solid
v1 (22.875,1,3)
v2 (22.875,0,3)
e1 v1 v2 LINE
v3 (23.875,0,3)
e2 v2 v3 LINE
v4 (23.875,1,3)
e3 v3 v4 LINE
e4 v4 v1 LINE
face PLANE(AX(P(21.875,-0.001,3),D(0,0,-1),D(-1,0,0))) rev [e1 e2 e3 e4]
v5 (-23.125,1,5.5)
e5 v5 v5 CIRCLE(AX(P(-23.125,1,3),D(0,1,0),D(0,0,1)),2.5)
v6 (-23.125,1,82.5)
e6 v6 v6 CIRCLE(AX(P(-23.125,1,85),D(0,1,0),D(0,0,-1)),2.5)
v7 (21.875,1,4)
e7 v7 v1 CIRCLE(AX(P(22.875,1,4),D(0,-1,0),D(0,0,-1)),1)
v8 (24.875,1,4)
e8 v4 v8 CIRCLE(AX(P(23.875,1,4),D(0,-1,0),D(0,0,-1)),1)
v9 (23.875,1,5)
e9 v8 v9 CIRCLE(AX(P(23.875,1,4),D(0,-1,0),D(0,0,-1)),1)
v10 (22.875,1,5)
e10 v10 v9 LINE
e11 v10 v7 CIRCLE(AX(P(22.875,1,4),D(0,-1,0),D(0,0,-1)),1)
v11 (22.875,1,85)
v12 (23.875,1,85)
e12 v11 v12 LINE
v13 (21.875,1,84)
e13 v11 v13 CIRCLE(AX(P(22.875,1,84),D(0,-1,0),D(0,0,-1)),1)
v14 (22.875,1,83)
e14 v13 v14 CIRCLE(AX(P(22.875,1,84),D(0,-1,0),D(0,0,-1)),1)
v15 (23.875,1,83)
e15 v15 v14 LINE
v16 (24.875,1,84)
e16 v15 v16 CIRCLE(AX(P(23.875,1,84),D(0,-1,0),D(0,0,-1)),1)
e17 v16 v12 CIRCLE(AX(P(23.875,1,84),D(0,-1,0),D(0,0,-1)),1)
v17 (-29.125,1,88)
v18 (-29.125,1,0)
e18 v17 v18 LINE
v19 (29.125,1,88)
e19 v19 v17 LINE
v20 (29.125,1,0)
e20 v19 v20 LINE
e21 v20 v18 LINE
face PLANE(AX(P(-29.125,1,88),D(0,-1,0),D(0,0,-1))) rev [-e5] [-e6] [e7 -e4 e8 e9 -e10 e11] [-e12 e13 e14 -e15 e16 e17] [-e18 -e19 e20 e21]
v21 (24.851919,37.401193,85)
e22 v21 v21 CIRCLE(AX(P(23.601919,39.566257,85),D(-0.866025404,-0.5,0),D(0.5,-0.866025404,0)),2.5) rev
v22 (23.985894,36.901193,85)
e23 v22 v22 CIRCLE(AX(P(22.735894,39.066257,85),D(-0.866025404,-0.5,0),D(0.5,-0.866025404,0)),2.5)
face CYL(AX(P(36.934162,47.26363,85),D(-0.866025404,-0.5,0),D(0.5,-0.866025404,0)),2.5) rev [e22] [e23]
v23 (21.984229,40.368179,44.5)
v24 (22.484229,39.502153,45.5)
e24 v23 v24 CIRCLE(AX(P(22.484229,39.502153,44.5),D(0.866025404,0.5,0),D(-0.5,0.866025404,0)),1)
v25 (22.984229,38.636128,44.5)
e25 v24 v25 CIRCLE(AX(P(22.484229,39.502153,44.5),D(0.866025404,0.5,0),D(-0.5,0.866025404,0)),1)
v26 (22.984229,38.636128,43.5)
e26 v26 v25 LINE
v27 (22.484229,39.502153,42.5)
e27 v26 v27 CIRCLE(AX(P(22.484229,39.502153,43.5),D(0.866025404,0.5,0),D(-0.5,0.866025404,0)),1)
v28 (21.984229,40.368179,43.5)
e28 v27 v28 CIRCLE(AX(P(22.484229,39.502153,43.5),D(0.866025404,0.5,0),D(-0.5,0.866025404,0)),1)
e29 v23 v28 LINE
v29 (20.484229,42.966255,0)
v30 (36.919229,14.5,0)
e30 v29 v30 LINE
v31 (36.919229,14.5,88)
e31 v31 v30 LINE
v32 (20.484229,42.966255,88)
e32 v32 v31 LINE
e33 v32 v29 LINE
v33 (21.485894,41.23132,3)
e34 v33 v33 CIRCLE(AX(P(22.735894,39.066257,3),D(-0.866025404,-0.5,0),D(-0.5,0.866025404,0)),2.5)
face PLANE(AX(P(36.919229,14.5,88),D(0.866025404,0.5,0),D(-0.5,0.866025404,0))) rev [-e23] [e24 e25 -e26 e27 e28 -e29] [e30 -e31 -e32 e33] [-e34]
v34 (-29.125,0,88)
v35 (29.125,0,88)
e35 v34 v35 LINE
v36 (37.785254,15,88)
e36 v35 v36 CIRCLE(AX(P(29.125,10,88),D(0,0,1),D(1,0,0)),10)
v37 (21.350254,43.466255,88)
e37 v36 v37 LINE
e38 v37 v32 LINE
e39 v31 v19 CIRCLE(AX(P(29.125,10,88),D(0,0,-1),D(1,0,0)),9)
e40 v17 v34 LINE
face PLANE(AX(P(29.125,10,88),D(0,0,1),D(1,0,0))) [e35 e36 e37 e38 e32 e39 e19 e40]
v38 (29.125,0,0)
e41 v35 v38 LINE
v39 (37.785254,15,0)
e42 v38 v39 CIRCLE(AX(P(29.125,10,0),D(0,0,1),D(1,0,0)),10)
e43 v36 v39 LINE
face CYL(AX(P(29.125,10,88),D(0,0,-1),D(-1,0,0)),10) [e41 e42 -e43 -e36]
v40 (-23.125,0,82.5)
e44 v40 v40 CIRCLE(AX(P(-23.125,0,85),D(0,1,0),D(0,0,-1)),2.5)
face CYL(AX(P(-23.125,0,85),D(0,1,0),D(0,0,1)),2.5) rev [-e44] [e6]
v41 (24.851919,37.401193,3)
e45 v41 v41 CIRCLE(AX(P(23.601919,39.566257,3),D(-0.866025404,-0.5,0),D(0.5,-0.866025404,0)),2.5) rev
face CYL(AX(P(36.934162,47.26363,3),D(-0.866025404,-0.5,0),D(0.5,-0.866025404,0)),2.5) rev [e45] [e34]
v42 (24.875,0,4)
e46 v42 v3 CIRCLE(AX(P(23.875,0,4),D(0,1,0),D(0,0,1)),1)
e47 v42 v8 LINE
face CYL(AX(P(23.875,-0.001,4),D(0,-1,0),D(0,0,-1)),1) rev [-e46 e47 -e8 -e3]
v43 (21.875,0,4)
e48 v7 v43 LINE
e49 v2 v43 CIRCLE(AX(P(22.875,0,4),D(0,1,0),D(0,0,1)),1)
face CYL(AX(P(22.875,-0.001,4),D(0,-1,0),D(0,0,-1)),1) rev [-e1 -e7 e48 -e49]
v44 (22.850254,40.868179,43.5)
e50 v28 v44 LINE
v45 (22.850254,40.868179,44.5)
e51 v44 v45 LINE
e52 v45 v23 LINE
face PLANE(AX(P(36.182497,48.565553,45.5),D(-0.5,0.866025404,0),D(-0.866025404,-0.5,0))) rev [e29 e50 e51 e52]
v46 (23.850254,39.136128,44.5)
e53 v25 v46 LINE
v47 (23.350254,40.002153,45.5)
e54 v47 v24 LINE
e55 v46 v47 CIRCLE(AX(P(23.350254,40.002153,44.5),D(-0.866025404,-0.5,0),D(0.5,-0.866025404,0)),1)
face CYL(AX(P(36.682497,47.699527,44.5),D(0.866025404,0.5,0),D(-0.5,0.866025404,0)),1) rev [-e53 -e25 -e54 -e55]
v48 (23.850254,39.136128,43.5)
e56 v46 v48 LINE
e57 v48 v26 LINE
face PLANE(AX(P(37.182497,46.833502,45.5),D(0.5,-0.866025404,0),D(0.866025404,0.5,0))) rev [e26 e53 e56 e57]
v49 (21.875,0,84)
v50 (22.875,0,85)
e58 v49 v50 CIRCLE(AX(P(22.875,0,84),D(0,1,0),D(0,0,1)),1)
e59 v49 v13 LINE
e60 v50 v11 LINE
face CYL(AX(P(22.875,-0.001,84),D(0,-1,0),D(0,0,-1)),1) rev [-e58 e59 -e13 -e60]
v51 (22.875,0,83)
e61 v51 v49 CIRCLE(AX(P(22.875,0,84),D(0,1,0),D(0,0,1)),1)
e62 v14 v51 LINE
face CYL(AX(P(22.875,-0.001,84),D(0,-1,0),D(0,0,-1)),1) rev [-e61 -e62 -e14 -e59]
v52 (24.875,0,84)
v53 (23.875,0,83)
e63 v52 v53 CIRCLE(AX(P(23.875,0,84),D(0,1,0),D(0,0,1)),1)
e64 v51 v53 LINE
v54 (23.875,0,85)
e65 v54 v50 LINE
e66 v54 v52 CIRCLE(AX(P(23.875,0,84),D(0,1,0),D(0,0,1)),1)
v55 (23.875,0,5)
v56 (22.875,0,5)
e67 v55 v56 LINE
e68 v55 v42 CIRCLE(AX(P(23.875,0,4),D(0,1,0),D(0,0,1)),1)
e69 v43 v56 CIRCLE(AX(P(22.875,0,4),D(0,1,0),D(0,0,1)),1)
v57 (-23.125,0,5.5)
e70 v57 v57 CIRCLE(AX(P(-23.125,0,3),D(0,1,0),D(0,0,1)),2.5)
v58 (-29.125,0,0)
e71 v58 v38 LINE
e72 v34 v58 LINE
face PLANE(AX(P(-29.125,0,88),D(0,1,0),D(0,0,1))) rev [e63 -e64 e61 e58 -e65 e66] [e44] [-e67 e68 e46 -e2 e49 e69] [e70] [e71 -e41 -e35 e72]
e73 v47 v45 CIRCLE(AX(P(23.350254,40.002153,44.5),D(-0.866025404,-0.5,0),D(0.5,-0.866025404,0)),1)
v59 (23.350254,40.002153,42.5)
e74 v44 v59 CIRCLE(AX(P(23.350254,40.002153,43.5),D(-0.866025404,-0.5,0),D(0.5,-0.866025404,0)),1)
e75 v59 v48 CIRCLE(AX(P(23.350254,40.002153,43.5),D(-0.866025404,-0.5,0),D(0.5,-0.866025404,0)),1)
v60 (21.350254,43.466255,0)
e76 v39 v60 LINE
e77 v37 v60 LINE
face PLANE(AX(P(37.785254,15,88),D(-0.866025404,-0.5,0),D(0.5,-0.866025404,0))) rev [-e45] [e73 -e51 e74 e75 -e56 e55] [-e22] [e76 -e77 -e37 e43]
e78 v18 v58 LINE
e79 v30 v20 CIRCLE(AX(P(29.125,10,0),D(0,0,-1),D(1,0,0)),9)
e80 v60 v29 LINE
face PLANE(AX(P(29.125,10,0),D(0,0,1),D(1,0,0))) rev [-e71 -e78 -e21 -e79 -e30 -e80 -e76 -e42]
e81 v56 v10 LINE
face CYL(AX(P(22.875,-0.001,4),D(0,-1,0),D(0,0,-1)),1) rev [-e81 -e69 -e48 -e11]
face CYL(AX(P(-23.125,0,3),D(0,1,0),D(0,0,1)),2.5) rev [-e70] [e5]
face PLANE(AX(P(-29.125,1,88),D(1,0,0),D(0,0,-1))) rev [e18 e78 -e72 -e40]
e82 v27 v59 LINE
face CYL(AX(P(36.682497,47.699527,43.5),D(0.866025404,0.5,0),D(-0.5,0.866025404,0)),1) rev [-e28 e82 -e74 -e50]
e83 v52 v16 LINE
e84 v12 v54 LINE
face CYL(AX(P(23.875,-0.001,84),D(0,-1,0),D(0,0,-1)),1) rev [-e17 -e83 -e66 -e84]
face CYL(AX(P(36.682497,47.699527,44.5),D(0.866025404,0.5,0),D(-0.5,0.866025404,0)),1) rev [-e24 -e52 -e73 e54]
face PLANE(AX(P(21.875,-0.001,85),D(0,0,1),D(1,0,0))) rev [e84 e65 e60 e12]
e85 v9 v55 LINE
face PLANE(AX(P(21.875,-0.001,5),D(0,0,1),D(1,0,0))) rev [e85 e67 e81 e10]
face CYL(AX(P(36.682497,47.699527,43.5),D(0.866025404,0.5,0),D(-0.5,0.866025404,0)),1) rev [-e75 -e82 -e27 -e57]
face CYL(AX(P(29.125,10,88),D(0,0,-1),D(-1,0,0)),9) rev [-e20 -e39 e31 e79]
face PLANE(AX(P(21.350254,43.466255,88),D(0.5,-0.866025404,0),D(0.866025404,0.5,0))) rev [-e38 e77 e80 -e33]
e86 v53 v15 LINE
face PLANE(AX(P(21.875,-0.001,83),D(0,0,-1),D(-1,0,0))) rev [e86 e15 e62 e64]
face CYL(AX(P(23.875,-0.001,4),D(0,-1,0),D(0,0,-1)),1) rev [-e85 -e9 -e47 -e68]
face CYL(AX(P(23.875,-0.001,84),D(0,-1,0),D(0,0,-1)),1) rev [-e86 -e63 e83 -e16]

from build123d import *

# Parameters (mm, degrees)
BASE_DEPTH                 = 88
SZKIC3_R                   = 2.5
HOLES_DEPTH                = 106.252783529
WYTNIJ_WYCI_GNI_CIE1_REACH = 107.253
SZKIC6_W                   = 3
SZKIC6_H                   = 2
WYTNIJ_WYCI_GNI_CIE3_REACH = 112.877
SZKIC7_R                   = 2.5
WYTNIJ_WYCI_GNI_CIE4_REACH = 112.877
SZKIC8_W                   = 3
SZKIC8_H                   = 2
ZAOKR_GLENIE1_R            = 1


with BuildPart() as part:
    # Szkic1 → base (new body)
    with BuildSketch(Plane.XY):
        with BuildLine():
            Line((-29.125, 0), (29.125, 0))
            ThreePointArc((29.125, 0), (37.785254038, 5), (37.785254038, 15))
            Line((37.785254038, 15), (21.350254038, 43.466255022))
            Line((21.350254038, 43.466255022), (20.484228634, 42.966255022))
            Line((20.484228634, 42.966255022), (36.919228634, 14.5))
            ThreePointArc((36.919228634, 14.5), (36.919228634, 5.5), (29.125, 1))
            Line((29.125, 1), (-29.125, 1))
            Line((-29.125, 1), (-29.125, 0))
        make_face()
    extrude(amount=BASE_DEPTH)

    # Szkic3 → holes (cut, through all)
    with BuildSketch(Plane(origin=(0, 1, 0), x_dir=(1, 0, 0), z_dir=(0, 1, 0))):
        with Locations(Location((-23.125, -3, 0), (0, 0, 270))):
            Circle(SZKIC3_R)
        with Locations(Location((-23.125, -85, 0), (0, 0, 90))):
            Circle(SZKIC3_R)
    extrude(amount=-HOLES_DEPTH, mode=Mode.SUBTRACT)

    # Szkic6 → Wytnij-wyciągnięcie1 (cut, up to next)
    with BuildSketch(Plane(origin=(0, 1, 0), x_dir=(1, 0, 0), z_dir=(0, 1, 0)), mode=Mode.PRIVATE) as wytnij_wyci_gni_cie1_sk1:
        with Locations((23.375, -84)):
            Rectangle(SZKIC6_W, SZKIC6_H)
    wytnij_wyci_gni_cie1_tool1 = extrude(wytnij_wyci_gni_cie1_sk1.sketch, amount=-WYTNIJ_WYCI_GNI_CIE1_REACH, mode=Mode.PRIVATE) & part.part
    # Szkic6 → Wytnij-wyciągnięcie1 (cut, up to next)
    with BuildSketch(Plane(origin=(0, 1, 0), x_dir=(1, 0, 0), z_dir=(0, 1, 0)), mode=Mode.PRIVATE) as wytnij_wyci_gni_cie1_sk2:
        with Locations((23.375, -4)):
            Rectangle(SZKIC6_W, SZKIC6_H)
    wytnij_wyci_gni_cie1_tool2 = extrude(wytnij_wyci_gni_cie1_sk2.sketch, amount=-WYTNIJ_WYCI_GNI_CIE1_REACH, mode=Mode.PRIVATE) & part.part
    add(wytnij_wyci_gni_cie1_tool1.solids().sort_by_distance((23.375, 1, 84))[0], mode=Mode.SUBTRACT)
    add(wytnij_wyci_gni_cie1_tool2.solids().sort_by_distance((23.375, 1, 4))[0], mode=Mode.SUBTRACT)

    # Szkic7 → Wytnij-wyciągnięcie3 (cut, up to next)
    with BuildSketch(Plane(origin=(33.968105653, 19.611494943, 0), x_dir=(0, 0, 1), z_dir=(-0.8660254037844387, -0.5000000000000001, 0)), mode=Mode.PRIVATE) as wytnij_wyci_gni_cie3_sk1:
        with Locations(Location((85, 22.464423789, 0), (0, 0, 270))):
            Circle(SZKIC7_R)
    wytnij_wyci_gni_cie3_tool1 = extrude(wytnij_wyci_gni_cie3_sk1.sketch, amount=-WYTNIJ_WYCI_GNI_CIE3_REACH, mode=Mode.PRIVATE) & part.part
    # Szkic7 → Wytnij-wyciągnięcie3 (cut, up to next)
    with BuildSketch(Plane(origin=(33.968105653, 19.611494943, 0), x_dir=(0, 0, 1), z_dir=(-0.8660254037844387, -0.5000000000000001, 0)), mode=Mode.PRIVATE) as wytnij_wyci_gni_cie3_sk2:
        with Locations(Location((3, 22.464423789, 0), (0, 0, 270))):
            Circle(SZKIC7_R)
    wytnij_wyci_gni_cie3_tool2 = extrude(wytnij_wyci_gni_cie3_sk2.sketch, amount=-WYTNIJ_WYCI_GNI_CIE3_REACH, mode=Mode.PRIVATE) & part.part
    add(wytnij_wyci_gni_cie3_tool1.solids().sort_by_distance((22.735894, 39.066257, 85))[0], mode=Mode.SUBTRACT)
    add(wytnij_wyci_gni_cie3_tool2.solids().sort_by_distance((22.735894, 39.066257, 3))[0], mode=Mode.SUBTRACT)

    # Szkic8 → Wytnij-wyciągnięcie4 (cut, up to next)
    with BuildSketch(Plane(origin=(33.968105653, 19.611494943, 0), x_dir=(0, 0, 1), z_dir=(-0.8660254037844387, -0.5000000000000001, 0)), mode=Mode.PRIVATE) as wytnij_wyci_gni_cie4_sk1:
        with Locations((44, 22.967754038)):
            Rectangle(SZKIC8_W, SZKIC8_H)
    wytnij_wyci_gni_cie4_tool1 = extrude(wytnij_wyci_gni_cie4_sk1.sketch, amount=-WYTNIJ_WYCI_GNI_CIE4_REACH, mode=Mode.PRIVATE) & part.part
    add(wytnij_wyci_gni_cie4_tool1.solids().sort_by_distance((22.484229, 39.502153, 44))[0], mode=Mode.SUBTRACT)

    # Zaokrąglenie1
    zaokr_glenie1_edges = [part.edges().sort_by_distance(p)[0] for p in [
        (22.417241336, 40.618178811, 42.5),
        (23.417241336, 38.886128003, 42.5),
        (22.417241336, 40.618178811, 45.5),
        (23.417241336, 38.886128003, 45.5),
        (21.875, 0.5, 85),
        (24.875, 0.5, 83),
        (24.875, 0.5, 85),
        (21.875, 0.5, 83),
        (21.875, 0.5, 3),
        (21.875, 0.5, 5),
        (24.875, 0.5, 3),
        (24.875, 0.5, 5),
    ]]
    fillet(zaokr_glenie1_edges, radius=ZAOKR_GLENIE1_R - 0.0001)  # a hair under: the kernel refuses the full size


solid = part.part
